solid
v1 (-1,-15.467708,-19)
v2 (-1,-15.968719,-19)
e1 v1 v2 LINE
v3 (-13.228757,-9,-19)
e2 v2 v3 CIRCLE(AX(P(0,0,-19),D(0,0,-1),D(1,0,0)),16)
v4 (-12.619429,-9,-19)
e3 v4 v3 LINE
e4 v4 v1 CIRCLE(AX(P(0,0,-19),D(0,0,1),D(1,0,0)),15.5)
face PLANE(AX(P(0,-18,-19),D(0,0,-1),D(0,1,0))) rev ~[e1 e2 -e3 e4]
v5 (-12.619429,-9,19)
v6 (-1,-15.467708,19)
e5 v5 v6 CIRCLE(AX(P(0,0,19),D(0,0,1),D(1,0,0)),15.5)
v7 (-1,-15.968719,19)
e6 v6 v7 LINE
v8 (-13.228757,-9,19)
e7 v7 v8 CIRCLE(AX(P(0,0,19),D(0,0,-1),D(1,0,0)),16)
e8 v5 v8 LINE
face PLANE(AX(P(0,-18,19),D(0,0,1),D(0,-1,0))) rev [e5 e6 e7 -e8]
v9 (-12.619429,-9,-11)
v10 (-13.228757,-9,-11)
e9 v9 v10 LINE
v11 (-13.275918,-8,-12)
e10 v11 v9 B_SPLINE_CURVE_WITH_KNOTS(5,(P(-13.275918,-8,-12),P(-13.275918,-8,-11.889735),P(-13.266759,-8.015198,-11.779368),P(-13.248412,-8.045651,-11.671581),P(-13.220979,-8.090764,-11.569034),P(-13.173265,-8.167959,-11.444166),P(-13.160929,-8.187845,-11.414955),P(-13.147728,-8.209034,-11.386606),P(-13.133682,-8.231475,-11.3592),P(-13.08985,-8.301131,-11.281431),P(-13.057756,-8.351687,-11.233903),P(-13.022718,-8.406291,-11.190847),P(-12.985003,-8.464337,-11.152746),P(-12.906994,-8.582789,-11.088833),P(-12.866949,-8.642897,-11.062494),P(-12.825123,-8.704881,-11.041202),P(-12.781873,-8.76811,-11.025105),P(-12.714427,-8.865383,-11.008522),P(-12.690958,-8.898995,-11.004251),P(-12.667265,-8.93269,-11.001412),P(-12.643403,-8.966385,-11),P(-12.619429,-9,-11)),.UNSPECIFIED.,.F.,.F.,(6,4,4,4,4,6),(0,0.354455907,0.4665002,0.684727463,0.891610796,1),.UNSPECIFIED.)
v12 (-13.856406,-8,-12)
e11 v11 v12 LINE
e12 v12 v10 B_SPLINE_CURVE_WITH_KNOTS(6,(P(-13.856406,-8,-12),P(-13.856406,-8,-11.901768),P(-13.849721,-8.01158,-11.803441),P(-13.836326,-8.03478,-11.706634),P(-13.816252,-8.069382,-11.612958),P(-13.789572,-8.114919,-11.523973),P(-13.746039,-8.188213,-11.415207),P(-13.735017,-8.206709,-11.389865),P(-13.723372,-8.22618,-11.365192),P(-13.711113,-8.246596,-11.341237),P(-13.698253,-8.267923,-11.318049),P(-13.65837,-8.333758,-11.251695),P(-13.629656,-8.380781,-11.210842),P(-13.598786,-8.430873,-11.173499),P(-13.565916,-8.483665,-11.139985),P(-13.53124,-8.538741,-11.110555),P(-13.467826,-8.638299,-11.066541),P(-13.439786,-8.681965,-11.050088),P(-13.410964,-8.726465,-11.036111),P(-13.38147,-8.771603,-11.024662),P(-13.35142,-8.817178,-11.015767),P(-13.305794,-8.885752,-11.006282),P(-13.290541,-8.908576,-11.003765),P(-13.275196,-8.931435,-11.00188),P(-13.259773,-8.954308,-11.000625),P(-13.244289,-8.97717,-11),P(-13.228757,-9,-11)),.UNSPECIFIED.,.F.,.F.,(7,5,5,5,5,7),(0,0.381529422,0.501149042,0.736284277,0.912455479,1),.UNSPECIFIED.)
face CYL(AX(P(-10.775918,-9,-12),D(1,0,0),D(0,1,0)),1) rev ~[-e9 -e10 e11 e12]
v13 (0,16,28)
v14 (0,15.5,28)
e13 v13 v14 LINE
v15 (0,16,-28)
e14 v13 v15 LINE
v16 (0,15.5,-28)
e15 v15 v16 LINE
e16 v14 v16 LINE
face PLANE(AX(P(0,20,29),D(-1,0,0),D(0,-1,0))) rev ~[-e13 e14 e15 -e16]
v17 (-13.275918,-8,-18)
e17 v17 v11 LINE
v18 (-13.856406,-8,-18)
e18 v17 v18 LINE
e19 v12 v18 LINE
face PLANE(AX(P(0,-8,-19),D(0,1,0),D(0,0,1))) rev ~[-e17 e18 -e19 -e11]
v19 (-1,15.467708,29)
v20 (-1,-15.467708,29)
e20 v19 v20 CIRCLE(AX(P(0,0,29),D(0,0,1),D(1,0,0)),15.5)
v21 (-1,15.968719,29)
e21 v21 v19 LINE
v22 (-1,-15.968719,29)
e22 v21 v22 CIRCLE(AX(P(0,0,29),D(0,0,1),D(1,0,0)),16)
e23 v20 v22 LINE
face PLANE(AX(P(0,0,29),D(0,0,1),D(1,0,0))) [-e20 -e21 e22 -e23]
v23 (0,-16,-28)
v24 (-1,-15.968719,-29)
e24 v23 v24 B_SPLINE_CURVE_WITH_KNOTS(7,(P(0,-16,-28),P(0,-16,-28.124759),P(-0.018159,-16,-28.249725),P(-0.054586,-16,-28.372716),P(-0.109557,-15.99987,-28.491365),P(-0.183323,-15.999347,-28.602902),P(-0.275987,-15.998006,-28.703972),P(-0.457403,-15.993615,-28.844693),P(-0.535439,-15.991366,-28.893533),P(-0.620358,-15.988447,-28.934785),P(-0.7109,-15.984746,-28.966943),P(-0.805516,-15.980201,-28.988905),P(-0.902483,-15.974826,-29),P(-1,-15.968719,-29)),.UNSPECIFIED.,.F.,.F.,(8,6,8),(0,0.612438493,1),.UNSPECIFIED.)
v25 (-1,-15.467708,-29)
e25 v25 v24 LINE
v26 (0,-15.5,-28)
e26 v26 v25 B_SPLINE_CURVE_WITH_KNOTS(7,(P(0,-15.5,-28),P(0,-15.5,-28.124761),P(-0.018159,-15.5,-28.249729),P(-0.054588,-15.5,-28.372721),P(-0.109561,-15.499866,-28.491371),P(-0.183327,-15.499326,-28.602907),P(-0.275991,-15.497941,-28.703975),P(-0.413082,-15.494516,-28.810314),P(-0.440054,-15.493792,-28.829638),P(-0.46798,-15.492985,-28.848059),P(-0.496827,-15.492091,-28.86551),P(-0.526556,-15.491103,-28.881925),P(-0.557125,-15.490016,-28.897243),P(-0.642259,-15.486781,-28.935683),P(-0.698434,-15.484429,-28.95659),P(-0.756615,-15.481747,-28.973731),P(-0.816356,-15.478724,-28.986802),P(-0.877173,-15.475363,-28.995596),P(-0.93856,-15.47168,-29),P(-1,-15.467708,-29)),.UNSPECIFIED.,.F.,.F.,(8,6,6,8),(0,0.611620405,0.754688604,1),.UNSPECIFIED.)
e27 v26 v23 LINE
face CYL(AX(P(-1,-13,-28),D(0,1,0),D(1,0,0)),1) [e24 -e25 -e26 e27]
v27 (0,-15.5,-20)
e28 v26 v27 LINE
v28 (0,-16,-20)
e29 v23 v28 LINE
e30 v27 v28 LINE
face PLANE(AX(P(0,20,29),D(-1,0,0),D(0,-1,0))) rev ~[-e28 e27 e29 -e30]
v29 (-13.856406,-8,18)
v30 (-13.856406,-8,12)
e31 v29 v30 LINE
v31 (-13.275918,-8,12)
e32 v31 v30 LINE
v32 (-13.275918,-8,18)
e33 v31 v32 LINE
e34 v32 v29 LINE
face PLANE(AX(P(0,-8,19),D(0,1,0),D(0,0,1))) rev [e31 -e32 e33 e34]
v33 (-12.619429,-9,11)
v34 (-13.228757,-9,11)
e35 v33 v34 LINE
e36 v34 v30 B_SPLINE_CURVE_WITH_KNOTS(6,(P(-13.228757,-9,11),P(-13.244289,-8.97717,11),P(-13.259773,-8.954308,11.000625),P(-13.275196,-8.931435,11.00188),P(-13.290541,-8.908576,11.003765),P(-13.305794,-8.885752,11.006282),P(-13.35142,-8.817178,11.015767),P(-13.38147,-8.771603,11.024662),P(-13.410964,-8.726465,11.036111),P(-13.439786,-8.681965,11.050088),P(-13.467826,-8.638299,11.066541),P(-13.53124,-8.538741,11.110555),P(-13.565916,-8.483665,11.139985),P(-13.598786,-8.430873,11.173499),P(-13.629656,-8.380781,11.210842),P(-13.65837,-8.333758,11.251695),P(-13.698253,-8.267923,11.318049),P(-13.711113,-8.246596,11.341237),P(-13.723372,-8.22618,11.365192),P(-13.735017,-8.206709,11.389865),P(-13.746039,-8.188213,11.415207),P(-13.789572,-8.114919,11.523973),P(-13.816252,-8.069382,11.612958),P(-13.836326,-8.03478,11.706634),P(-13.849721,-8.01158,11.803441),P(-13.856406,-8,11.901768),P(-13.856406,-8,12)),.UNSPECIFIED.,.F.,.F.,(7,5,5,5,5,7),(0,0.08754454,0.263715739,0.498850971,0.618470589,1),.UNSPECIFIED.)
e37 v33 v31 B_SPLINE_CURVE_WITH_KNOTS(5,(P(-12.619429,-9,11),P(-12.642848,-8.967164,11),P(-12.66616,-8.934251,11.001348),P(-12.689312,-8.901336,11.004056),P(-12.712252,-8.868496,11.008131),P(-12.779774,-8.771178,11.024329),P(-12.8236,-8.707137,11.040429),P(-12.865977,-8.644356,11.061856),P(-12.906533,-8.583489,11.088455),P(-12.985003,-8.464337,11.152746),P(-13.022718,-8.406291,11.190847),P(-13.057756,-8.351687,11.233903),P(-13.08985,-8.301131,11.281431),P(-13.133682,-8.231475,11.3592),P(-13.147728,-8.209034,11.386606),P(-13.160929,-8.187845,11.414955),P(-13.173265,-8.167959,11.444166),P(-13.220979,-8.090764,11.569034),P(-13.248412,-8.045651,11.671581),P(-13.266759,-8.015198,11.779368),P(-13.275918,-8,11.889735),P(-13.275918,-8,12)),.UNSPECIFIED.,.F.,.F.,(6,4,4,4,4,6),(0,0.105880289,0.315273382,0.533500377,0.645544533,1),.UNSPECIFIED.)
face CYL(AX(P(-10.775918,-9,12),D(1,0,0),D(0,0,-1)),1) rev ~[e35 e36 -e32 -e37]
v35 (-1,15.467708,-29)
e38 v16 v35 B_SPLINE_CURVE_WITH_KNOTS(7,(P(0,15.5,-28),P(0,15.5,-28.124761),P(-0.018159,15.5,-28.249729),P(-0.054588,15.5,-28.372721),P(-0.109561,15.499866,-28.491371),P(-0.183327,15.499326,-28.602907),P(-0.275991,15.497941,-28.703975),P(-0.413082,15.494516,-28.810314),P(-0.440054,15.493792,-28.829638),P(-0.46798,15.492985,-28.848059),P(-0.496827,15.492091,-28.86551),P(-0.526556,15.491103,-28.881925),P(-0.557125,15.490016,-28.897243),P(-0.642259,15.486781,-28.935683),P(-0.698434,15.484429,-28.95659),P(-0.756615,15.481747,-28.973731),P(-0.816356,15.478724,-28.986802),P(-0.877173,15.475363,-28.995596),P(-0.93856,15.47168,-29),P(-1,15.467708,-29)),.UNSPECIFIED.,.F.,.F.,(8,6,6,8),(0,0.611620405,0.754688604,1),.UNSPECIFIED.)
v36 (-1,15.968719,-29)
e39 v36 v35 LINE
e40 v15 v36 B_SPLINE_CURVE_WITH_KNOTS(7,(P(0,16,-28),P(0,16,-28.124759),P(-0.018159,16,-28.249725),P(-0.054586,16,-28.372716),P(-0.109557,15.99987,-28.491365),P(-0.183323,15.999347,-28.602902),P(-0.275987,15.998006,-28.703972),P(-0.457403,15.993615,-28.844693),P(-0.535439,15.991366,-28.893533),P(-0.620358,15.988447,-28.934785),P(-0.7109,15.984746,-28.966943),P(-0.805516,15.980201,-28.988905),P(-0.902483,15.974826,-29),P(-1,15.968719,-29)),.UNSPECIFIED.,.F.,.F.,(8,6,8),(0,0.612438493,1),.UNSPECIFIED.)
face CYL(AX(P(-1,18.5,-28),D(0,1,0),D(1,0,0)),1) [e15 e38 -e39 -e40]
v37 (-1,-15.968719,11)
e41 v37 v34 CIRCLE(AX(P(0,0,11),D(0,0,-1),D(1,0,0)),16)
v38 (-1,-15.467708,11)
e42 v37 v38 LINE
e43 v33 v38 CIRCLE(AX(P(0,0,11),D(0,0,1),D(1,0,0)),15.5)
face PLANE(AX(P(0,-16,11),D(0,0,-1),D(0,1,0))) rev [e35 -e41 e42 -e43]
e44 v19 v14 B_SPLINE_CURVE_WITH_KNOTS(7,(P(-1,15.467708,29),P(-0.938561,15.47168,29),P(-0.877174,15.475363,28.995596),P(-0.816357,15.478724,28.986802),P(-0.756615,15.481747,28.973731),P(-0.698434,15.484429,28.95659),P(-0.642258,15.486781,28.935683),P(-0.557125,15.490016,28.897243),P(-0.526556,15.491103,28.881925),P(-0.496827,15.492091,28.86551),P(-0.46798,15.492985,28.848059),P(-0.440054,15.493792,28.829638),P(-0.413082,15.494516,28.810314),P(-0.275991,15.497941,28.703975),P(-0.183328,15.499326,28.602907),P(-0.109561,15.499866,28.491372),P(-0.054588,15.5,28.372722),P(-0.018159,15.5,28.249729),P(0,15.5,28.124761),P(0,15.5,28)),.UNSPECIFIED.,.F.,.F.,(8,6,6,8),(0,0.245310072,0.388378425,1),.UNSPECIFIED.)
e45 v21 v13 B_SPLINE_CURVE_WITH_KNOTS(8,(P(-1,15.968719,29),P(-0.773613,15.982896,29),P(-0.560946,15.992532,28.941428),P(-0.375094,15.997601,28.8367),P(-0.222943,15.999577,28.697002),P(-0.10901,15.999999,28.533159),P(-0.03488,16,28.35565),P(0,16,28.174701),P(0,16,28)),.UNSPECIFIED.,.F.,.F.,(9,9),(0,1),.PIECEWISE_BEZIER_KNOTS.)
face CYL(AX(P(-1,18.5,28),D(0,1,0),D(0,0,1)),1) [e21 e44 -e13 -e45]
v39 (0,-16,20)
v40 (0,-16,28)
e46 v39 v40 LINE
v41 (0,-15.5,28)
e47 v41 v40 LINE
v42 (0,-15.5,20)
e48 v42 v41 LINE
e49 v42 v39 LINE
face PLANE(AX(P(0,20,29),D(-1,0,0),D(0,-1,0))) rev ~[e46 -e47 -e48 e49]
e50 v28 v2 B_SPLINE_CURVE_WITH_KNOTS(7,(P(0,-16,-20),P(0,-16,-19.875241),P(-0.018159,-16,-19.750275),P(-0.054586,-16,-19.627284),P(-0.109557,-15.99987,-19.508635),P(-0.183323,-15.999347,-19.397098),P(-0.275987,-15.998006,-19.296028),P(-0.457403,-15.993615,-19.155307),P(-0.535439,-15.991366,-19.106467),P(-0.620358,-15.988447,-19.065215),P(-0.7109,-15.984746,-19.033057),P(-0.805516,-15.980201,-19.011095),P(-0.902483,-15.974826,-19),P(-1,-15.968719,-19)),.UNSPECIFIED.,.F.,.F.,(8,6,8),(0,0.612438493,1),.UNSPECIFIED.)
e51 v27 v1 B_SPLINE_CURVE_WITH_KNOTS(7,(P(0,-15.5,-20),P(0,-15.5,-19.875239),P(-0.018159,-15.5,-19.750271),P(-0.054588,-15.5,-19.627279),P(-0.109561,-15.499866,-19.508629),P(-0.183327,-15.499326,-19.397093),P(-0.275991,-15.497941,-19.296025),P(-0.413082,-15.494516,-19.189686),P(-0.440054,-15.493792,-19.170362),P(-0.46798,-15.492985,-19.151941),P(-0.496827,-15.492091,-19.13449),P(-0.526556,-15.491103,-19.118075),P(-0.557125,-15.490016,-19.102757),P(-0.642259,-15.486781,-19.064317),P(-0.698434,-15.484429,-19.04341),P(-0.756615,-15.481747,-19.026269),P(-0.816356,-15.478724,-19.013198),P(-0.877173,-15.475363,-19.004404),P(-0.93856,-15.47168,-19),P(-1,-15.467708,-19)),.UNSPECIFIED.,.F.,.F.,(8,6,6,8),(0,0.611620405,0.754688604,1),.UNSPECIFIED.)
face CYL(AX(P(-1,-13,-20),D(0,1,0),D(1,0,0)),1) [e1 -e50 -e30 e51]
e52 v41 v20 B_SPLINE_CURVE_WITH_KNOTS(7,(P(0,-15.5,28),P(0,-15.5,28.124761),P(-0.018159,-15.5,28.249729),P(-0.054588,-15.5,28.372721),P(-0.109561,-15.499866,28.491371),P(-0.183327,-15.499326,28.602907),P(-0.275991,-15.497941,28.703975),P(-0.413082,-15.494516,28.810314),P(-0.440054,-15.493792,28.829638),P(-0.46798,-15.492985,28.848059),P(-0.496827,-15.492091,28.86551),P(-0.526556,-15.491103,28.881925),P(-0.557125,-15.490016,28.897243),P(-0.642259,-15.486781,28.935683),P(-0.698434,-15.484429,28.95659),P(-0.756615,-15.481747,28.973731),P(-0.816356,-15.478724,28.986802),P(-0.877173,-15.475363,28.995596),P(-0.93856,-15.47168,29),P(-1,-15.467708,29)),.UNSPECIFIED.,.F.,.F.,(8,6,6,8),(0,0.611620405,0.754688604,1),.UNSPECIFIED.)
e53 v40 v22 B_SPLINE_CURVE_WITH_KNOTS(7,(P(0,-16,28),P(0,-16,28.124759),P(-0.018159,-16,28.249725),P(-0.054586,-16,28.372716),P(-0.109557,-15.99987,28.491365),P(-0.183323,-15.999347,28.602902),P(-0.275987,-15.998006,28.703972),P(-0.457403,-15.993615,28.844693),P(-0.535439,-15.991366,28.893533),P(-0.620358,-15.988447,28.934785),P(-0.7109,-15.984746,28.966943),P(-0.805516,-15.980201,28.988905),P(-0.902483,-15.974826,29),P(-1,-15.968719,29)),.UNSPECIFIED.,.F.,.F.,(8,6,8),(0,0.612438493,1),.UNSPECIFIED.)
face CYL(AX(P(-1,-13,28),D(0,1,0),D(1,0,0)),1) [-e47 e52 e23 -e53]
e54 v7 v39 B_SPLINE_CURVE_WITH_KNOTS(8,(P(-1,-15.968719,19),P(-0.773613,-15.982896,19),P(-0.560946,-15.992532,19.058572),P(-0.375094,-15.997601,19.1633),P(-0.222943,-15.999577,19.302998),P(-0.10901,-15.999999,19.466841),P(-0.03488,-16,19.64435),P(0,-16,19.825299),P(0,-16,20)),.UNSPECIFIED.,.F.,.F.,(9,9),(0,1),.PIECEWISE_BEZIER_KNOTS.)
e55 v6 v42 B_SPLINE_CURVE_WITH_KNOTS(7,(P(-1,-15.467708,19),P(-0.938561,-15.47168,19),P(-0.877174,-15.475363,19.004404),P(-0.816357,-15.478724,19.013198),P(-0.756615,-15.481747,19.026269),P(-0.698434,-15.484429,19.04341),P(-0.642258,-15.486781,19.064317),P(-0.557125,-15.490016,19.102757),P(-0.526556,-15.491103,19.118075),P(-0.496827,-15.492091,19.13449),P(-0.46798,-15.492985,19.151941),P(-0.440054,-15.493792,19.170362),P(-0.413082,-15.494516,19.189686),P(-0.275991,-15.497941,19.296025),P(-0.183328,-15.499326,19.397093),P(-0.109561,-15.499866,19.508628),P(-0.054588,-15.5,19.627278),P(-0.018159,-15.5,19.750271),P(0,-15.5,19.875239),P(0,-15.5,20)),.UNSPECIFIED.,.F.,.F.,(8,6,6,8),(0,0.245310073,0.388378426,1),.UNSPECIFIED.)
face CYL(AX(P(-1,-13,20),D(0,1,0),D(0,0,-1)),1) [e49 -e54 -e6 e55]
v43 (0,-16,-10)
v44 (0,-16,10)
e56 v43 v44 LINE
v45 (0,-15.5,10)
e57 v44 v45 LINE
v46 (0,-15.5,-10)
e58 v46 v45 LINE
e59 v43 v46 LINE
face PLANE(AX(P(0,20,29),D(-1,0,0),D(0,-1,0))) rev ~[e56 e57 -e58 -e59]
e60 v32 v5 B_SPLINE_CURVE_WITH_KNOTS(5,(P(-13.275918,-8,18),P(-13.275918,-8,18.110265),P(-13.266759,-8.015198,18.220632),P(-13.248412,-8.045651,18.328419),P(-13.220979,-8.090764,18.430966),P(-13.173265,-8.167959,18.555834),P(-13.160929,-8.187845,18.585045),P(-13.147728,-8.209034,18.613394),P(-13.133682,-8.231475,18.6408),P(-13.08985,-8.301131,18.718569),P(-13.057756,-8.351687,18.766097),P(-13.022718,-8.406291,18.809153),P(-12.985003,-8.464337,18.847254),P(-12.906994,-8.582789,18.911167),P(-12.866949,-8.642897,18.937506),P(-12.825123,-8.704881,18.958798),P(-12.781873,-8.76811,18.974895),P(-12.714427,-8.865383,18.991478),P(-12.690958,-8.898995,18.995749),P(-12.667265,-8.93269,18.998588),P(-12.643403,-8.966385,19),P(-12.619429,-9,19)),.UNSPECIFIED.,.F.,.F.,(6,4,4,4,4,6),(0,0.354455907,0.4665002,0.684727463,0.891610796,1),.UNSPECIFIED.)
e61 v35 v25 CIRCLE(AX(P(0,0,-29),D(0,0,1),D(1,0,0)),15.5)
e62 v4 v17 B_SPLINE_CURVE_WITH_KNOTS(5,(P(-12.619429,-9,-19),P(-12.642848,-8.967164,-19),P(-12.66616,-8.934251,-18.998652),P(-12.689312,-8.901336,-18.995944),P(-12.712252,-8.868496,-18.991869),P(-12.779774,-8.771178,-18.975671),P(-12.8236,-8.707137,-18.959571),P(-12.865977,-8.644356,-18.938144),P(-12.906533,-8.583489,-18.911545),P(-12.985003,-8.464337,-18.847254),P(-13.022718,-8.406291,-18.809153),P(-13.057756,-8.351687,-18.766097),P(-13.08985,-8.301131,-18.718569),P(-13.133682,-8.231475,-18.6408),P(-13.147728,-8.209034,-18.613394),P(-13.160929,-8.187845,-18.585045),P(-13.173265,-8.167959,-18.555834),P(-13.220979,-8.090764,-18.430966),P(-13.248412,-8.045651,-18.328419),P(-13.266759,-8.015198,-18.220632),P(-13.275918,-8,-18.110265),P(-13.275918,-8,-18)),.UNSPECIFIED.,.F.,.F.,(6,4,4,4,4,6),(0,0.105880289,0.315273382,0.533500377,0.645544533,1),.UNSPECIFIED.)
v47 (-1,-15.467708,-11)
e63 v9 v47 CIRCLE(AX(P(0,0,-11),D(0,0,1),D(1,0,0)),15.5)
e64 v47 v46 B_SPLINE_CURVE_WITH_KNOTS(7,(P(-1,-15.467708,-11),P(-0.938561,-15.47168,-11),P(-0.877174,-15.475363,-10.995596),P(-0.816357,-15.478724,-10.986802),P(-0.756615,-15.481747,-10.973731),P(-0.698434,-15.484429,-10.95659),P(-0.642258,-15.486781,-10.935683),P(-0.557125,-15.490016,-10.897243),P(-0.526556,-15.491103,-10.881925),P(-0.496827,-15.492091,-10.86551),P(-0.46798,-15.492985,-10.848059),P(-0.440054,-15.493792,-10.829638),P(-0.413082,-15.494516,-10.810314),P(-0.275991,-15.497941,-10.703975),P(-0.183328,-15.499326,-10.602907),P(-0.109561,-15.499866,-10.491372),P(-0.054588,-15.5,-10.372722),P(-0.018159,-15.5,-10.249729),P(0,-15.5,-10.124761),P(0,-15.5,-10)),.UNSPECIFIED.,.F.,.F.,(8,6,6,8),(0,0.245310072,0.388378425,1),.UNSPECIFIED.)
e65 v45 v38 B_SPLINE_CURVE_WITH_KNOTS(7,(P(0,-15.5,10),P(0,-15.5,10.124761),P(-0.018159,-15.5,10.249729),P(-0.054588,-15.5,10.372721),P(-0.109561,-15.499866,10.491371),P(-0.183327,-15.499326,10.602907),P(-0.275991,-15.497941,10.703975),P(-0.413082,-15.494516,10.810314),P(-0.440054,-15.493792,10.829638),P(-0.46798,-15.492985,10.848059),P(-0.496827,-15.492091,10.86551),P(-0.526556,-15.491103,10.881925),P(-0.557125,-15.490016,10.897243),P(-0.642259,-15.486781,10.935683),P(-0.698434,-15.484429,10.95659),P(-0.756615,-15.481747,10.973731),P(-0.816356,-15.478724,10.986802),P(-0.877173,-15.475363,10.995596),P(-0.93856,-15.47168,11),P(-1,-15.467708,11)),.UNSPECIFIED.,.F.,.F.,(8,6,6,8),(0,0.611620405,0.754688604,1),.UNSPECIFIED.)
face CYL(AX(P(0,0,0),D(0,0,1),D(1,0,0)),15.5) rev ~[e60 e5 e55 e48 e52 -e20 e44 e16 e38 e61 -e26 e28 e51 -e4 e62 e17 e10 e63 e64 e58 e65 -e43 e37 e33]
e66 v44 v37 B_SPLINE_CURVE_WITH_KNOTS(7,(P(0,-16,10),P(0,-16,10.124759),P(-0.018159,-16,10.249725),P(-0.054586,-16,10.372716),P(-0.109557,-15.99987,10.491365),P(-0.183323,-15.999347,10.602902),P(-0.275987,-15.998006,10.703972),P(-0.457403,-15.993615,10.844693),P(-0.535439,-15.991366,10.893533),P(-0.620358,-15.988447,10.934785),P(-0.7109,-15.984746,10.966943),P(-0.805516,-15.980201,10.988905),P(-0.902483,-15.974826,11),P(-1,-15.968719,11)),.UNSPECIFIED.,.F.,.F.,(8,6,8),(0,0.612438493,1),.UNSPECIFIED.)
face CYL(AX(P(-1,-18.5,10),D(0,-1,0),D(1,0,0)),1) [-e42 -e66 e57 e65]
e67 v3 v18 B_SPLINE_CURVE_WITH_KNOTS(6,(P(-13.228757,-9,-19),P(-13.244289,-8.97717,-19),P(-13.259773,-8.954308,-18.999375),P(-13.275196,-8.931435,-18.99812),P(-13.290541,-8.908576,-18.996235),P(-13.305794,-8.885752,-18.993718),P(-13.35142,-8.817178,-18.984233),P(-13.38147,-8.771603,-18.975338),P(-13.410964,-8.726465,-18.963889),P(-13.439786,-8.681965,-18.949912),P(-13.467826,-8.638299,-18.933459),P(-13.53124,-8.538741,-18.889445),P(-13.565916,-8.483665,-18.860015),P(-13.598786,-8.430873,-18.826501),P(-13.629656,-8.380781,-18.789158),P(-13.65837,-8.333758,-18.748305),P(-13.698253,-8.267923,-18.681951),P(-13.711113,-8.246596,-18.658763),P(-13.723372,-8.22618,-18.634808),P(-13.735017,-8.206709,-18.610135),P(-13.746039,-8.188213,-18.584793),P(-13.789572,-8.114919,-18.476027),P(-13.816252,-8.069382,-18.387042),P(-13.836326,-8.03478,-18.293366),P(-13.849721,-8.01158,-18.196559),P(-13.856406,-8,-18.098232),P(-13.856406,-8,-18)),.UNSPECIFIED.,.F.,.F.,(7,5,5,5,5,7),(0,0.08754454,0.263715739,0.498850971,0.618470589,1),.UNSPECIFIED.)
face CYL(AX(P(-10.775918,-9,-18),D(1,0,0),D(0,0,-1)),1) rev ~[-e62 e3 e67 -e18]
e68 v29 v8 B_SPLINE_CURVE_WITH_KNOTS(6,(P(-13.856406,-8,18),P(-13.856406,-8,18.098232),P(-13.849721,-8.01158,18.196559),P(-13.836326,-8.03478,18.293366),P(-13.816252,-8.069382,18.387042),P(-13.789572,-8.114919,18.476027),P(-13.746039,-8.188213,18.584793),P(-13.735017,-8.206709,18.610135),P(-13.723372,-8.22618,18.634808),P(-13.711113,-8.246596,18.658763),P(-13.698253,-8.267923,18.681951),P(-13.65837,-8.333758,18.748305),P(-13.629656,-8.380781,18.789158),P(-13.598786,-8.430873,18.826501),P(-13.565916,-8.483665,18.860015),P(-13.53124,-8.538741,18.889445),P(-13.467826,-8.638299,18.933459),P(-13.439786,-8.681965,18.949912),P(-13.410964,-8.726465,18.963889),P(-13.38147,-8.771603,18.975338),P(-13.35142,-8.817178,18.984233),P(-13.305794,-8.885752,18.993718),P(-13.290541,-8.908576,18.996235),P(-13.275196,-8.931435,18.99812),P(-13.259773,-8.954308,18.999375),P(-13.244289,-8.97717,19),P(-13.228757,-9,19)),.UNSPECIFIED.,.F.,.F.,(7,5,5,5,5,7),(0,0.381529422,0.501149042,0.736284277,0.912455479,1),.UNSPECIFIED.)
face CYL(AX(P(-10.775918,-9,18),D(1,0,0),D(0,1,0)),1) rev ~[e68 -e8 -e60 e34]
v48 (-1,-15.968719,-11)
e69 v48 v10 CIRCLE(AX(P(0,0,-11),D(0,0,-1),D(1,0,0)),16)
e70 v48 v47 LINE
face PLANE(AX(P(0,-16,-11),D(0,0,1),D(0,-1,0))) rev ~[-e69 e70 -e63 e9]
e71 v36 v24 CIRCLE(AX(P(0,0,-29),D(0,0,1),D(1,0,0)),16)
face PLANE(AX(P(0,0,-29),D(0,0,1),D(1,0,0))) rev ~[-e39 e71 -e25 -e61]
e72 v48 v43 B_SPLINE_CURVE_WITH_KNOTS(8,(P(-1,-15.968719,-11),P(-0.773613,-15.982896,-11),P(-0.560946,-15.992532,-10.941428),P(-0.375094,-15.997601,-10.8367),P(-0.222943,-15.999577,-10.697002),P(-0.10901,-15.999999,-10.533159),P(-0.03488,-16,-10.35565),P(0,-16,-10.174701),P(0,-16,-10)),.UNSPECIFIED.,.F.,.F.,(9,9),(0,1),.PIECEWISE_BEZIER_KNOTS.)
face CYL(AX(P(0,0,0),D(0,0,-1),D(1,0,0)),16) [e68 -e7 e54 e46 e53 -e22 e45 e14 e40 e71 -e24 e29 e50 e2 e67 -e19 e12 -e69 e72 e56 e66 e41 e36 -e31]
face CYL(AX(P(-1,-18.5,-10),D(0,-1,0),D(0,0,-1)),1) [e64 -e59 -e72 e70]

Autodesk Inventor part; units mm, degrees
ref_plane "YZ Plane" through (0, 0, 0) normal (1, 0, 0) x (0, 1, 0)
ref_plane "XZ Plane" through (0, 0, 0) normal (0, 1, 0) x (-1, 0, 0)
ref_plane "XY Plane" through (0, 0, 0) normal (0, 0, 1) x (1, 0, 0)
sketch "Sketch1" plane through (0, 0, 0) normal (0, 0, 1) x (1, 0, 0)
  circle A0 centre (0, 0) radius 15.5
  circle A1 centre (0, 0) radius 16
  dimension "d0" = 32
  dimension "d1" = 0.5
extrude "Extrusion1" add sketch "Sketch1" along normal mid plane 58
sketch "Sketch3" plane through (0, 0, 29) normal (0, 0, 1) x (1, 0, 0)
  circle A0 centre (0, 0) radius 15.5 construction
  circle A1 centre (0, 0) radius 16 construction
  line L0 (0, -20) -> (20, -20)
  line L1 (20, -20) -> (20, 20)
  line L2 (20, 20) -> (0, 20)
  line L3 (0, 20) -> (0, -20)
  dimension "d8" = 20
  dimension "d9" = 40
extrude "Extrusion3" cut sketch "Sketch3" against normal through all
sketch "Sketch4" plane through (0, 0, 0) normal (1, 0, 0) x (0, 1, 0)
  line L0 (-18, -19) -> (-8, -19)
  line L1 (-8, -19) -> (-8, -11)
  line L2 (-8, -11) -> (-18, -11)
  line L3 (-18, -11) -> (-18, -19)
  line L4 (-16, -29) -> (16, -29) projected
  line L5 (-16, -29) -> (-16, 29) projected
  point P0 (0, 0)
  dimension "d12" = 8
  dimension "d13" = 10
  dimension "d14" = 2
  dimension "d17" = 8
extrude "Extrusion4" cut sketch "Sketch4" against normal through all
mirror "Mirror1" about plane through (0, 0, 0) normal (0, 0, 1) of "Extrusion4"
fillet "Fillet1" radius 1 12 edges at (0, -15.75, 19) (0, -15.75, 11) (0, -15.75, 29) (0, 15.75, 29) (-13.5662, -8, 19) (-13.5662, -8, 11) (-13.5662, -8, -11) (0, -15.75, -11) (-13.5662, -8, -19) (0, -15.75, -19) (0, -15.75, -29) (0, 15.75, -29)
properties part number "LP-screen-sheet-metal" material "Stainless Steel"
